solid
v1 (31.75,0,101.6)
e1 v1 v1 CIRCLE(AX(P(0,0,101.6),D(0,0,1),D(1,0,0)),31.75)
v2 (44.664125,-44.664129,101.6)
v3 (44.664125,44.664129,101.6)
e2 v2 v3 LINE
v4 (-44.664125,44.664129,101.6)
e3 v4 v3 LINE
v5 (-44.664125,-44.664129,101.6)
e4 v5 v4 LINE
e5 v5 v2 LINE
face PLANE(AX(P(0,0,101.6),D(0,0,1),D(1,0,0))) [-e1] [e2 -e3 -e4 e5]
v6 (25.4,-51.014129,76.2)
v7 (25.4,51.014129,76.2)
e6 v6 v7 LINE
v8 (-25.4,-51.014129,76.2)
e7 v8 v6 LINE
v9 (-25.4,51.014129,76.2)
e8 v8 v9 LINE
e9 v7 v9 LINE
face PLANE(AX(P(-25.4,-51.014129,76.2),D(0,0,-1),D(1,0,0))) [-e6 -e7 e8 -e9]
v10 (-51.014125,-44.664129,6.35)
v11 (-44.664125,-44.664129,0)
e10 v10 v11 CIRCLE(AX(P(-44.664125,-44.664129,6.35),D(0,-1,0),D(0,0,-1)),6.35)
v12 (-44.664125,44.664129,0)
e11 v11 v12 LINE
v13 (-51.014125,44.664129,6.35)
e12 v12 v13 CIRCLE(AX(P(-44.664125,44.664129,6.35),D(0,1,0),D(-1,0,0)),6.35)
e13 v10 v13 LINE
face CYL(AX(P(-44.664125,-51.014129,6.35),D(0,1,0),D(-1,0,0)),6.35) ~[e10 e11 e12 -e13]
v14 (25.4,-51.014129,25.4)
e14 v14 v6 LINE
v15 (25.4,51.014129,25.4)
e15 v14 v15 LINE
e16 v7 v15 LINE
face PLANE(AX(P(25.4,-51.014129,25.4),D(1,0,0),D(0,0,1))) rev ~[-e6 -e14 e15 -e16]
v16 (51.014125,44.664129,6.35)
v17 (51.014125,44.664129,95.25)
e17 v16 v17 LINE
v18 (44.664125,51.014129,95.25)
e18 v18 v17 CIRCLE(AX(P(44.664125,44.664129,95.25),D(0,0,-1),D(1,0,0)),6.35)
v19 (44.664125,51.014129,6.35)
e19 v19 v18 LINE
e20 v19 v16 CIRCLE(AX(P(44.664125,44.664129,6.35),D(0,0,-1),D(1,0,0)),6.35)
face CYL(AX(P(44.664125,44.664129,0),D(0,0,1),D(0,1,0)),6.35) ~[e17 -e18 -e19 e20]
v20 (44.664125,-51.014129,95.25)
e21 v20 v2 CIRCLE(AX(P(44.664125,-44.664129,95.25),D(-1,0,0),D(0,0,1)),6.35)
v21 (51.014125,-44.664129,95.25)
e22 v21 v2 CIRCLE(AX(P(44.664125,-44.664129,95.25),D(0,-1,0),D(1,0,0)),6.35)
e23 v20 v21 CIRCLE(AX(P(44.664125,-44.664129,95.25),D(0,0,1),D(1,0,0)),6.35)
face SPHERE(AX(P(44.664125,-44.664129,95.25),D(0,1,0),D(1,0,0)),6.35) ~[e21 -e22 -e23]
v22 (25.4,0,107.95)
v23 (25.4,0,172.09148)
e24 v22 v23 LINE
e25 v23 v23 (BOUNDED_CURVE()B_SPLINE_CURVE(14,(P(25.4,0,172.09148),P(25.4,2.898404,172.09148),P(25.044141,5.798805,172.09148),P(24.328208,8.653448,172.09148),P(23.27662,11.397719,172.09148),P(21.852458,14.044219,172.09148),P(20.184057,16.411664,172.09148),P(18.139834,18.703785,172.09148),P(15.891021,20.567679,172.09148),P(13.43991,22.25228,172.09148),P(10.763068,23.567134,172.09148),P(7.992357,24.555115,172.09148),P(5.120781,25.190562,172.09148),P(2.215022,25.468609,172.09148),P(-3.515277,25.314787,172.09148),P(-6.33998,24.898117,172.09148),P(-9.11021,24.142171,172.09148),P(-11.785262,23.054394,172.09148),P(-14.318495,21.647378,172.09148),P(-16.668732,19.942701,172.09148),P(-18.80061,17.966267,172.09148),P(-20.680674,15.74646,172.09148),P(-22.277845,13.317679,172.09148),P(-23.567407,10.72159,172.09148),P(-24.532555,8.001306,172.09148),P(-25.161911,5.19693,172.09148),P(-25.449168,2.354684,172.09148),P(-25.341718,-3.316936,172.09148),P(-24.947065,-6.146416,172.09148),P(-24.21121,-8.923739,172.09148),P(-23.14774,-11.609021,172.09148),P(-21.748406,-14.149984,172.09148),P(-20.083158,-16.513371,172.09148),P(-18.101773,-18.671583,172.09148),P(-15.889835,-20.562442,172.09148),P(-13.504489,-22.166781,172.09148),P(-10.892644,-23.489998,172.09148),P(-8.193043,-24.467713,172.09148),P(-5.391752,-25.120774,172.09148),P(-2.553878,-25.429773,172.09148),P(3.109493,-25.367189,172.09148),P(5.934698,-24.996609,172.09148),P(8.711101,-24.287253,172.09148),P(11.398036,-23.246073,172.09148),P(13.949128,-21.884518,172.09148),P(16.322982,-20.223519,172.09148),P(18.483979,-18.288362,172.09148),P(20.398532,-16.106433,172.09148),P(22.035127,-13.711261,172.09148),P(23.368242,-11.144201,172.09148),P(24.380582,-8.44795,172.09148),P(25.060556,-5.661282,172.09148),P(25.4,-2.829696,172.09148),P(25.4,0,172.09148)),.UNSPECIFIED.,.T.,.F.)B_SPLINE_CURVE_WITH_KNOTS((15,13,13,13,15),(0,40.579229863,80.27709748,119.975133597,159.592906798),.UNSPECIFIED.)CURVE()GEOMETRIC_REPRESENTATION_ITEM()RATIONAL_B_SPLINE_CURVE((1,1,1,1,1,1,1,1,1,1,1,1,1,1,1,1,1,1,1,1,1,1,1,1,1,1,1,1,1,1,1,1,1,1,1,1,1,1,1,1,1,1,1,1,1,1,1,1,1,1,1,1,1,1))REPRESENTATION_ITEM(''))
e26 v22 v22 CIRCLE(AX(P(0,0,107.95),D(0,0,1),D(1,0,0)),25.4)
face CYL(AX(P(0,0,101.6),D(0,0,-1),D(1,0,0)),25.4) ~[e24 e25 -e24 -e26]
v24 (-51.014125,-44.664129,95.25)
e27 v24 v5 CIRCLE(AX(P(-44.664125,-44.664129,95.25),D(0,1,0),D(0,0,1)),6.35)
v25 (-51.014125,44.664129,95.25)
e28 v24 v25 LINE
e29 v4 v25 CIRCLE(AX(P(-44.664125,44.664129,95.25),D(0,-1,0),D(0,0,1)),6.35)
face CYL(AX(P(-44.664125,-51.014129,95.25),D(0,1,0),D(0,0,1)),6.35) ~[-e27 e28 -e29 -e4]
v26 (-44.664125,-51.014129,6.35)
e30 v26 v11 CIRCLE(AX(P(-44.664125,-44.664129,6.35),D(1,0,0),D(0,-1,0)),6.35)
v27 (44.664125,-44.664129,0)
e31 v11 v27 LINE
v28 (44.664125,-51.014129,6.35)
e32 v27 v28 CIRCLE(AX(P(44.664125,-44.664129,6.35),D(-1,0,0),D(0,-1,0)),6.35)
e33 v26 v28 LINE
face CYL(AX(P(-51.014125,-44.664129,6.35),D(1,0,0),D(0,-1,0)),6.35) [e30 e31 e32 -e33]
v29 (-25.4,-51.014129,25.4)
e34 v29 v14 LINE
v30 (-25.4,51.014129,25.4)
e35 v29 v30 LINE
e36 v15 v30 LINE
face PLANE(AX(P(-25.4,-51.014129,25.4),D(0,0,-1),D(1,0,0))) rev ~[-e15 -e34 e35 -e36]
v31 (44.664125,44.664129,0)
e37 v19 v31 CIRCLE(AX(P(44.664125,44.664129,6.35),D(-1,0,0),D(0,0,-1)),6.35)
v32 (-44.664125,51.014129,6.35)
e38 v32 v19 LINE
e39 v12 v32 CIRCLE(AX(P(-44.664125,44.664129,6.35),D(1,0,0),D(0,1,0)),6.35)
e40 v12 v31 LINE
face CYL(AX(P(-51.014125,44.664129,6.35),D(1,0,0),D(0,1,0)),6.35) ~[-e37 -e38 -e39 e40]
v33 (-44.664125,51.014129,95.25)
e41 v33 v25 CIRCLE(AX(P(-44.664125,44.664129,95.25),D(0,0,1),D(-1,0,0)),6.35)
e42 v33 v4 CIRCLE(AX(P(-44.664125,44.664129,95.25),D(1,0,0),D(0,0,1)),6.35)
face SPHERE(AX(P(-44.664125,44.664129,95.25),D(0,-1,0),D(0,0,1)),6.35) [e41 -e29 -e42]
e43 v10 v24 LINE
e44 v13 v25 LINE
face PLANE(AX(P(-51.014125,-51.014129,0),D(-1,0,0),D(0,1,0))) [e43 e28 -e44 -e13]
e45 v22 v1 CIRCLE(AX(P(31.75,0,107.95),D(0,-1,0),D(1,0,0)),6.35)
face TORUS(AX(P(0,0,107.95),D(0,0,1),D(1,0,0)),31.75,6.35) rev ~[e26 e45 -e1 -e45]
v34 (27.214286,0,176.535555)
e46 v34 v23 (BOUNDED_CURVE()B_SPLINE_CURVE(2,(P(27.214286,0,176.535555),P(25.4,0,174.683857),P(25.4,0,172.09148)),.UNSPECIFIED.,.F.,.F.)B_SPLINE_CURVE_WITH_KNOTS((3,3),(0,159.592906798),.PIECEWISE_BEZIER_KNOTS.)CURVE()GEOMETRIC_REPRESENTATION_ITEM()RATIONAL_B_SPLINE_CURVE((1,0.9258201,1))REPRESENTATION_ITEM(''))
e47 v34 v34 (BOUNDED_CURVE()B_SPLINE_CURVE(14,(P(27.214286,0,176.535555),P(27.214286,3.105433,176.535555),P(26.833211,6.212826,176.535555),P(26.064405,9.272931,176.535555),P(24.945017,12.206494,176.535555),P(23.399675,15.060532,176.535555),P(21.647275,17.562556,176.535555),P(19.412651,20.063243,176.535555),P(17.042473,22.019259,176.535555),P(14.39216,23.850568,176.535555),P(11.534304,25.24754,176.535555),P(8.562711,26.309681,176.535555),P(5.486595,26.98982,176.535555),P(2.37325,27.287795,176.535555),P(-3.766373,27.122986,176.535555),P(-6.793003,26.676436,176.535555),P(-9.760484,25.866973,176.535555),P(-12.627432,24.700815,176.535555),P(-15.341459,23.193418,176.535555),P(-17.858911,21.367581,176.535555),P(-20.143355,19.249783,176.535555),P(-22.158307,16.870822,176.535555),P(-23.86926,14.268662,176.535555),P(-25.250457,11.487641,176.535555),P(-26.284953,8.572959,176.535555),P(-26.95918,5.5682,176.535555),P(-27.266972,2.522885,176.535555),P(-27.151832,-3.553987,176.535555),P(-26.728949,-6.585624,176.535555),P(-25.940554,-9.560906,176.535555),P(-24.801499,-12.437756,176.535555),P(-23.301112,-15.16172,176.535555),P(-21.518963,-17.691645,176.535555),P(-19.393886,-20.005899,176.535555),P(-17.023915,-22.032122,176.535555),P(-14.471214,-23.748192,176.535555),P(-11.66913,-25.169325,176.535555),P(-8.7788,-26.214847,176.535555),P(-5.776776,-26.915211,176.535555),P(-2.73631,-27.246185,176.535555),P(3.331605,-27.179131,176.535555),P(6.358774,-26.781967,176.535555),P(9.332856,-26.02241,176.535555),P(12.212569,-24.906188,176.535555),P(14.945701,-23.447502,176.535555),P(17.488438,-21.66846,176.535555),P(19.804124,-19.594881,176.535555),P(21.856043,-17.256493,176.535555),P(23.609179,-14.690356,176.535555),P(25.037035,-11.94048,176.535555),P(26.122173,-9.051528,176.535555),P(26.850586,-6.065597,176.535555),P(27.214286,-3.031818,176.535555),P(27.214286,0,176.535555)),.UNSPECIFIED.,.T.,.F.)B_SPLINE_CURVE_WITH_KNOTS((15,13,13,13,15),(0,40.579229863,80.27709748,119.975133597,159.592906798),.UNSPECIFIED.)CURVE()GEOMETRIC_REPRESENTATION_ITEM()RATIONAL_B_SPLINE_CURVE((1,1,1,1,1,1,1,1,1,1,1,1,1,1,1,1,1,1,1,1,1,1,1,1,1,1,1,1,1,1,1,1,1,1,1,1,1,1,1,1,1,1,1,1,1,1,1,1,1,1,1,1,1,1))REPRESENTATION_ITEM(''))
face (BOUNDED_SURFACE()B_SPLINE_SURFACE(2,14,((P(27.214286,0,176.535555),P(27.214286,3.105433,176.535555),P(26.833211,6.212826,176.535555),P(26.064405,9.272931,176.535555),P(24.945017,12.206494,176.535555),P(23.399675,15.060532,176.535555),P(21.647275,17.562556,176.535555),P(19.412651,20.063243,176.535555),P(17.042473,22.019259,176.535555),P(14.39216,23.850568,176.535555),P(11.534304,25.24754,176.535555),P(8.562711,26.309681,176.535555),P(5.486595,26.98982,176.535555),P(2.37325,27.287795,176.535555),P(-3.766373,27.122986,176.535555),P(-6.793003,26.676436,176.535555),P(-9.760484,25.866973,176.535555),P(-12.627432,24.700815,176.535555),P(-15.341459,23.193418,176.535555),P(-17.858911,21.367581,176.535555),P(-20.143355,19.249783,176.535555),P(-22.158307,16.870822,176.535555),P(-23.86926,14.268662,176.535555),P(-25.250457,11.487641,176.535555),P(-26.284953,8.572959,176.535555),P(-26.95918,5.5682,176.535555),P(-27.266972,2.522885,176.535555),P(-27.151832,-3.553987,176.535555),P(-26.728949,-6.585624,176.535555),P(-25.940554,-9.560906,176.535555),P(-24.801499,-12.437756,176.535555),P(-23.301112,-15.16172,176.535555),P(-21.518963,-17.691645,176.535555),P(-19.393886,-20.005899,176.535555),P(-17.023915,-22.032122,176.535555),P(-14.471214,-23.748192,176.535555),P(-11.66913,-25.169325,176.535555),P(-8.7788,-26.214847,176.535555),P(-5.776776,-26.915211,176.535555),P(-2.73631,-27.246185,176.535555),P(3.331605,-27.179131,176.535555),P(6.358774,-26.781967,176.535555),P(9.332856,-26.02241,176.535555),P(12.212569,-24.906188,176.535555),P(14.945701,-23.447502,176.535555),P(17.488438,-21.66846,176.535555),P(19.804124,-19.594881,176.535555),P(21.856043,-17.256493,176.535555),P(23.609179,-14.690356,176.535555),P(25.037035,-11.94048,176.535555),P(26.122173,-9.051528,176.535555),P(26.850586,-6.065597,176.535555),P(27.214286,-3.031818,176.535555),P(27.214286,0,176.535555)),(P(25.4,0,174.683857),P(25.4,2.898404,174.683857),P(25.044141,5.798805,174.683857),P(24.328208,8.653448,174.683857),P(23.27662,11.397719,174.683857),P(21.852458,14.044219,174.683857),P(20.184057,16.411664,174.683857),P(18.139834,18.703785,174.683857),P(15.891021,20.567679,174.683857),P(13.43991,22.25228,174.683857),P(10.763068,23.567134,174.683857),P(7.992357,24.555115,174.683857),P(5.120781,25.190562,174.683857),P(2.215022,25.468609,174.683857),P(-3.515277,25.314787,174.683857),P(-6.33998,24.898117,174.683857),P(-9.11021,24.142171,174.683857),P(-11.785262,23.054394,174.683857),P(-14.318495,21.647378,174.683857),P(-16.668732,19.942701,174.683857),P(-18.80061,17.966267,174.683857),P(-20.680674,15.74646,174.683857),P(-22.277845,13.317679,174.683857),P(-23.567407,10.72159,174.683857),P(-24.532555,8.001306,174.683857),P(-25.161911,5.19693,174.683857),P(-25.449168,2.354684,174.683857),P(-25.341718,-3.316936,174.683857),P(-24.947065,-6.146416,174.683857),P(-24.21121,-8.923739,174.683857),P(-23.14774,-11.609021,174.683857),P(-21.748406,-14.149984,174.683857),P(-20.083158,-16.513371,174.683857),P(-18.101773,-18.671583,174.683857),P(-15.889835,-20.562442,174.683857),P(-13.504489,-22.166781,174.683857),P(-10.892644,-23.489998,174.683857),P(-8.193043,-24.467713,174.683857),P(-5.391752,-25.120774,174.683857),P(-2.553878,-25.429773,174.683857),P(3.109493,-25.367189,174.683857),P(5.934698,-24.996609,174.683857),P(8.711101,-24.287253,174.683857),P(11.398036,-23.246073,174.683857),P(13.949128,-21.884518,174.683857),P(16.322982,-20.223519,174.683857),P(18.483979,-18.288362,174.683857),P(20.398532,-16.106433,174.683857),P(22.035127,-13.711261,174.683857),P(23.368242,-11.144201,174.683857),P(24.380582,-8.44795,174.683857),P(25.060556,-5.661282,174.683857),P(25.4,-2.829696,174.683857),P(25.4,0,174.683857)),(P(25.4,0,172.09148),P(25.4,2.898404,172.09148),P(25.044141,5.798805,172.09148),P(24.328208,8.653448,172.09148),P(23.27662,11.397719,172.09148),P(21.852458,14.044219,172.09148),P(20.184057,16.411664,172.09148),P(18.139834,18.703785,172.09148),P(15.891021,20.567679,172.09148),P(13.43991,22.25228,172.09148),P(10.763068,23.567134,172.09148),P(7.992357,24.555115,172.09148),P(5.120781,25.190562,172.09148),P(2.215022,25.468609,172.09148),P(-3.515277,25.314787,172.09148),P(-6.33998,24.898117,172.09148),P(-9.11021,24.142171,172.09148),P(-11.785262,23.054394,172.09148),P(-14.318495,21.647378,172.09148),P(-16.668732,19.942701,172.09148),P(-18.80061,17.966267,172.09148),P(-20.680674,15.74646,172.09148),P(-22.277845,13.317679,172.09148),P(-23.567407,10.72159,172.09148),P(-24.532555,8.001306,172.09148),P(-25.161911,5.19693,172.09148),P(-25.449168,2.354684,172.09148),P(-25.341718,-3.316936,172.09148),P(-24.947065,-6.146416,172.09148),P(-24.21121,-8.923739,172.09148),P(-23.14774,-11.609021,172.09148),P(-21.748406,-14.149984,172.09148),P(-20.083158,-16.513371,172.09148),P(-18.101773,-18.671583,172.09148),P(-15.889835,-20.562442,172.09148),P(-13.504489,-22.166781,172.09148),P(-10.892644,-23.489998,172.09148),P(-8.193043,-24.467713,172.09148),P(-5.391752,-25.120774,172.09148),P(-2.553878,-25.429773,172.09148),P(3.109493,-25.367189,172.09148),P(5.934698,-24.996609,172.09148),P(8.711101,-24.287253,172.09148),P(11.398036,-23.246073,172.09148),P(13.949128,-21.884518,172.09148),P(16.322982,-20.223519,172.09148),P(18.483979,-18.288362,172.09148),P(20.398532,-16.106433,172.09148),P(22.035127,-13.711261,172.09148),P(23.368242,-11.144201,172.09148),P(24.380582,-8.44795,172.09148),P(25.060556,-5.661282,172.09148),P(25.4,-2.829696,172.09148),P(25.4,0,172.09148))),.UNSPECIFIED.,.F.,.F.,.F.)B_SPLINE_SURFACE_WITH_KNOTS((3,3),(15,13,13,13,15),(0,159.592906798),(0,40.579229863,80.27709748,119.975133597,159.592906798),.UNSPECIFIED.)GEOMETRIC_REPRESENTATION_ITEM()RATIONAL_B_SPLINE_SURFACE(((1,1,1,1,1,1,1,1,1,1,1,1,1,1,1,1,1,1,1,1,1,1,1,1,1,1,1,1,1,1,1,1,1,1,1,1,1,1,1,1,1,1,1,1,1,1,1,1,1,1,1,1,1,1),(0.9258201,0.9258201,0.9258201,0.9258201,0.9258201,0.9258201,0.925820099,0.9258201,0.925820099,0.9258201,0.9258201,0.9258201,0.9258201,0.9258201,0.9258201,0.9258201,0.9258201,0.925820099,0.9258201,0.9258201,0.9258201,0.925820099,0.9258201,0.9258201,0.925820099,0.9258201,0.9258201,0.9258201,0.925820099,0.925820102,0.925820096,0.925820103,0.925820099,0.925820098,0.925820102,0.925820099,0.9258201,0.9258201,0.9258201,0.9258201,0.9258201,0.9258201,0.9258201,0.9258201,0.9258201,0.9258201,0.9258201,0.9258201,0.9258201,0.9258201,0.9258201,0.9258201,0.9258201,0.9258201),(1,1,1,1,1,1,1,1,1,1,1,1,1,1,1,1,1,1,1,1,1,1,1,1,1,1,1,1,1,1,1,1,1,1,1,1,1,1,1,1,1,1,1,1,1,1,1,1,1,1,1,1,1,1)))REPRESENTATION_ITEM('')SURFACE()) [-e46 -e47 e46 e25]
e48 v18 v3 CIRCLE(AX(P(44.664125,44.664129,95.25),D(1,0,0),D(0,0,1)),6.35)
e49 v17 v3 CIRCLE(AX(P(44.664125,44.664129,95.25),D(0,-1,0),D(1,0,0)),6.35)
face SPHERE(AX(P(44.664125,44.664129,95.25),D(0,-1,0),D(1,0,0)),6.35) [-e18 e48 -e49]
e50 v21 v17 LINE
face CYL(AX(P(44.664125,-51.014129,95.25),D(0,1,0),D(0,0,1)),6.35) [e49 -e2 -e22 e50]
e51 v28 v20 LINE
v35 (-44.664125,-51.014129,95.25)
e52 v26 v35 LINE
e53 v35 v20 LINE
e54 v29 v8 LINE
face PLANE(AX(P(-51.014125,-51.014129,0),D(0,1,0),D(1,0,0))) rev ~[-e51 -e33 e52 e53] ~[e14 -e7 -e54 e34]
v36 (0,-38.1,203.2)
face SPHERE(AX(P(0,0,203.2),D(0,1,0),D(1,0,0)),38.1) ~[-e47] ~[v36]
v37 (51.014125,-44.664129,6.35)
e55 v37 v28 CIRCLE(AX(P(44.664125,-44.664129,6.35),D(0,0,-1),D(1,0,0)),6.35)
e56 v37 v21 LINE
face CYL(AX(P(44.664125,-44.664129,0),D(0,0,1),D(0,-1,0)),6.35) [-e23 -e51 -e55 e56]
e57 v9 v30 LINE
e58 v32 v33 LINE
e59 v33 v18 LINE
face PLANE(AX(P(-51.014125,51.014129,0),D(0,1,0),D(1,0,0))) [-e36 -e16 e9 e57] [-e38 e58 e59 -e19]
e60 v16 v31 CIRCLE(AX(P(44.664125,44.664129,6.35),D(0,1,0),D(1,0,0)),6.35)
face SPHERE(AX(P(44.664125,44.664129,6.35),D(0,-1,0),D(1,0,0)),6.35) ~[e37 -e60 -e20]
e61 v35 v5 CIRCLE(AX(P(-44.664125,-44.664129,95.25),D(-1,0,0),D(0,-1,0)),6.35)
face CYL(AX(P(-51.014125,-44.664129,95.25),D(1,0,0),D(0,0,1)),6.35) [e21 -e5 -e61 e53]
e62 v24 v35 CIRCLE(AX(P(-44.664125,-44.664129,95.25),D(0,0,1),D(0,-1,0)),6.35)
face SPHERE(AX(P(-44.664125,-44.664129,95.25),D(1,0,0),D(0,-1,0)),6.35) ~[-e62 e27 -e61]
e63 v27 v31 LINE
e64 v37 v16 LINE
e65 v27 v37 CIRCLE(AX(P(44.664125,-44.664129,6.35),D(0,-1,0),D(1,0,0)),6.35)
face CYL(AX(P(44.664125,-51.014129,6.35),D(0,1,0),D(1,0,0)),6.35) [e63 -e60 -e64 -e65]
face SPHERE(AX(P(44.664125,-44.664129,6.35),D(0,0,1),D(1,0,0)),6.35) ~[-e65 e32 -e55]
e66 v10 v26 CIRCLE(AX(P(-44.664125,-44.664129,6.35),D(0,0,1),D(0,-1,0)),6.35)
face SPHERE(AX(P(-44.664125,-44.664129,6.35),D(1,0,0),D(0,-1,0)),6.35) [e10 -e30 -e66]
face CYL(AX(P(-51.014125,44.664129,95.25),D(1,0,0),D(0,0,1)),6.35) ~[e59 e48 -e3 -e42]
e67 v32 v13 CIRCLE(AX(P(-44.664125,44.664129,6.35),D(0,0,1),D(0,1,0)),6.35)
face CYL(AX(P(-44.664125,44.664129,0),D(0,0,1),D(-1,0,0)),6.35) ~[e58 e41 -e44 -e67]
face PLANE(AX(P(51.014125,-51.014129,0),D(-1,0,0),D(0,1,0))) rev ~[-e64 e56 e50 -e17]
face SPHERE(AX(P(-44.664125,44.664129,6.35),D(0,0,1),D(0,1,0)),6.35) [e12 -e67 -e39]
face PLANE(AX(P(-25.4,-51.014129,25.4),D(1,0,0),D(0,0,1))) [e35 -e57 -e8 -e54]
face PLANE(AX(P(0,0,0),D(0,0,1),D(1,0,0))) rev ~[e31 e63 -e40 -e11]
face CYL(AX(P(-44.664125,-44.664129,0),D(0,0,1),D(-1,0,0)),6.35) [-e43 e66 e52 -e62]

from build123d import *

# Parameters (mm, degrees)
F0_W     = 102.0282506943
F0_H     = 102.0282581449
F1_DEPTH = 101.6
F2_R     = 25.4
F3_DEPTH = 101.6
F6_W     = 50.8
F6_H     = 50.8
F7_DEPTH = 130.048
F8_R     = 6.35


with BuildPart() as f1:
    # F0 (on Top) → F1 (new body)
    with BuildSketch(Plane.XY):
        Rectangle(F0_W, F0_H)
    extrude(amount=F1_DEPTH)

    # F2 (on face) → F3 (join)
    with BuildSketch(Plane.XY.offset(101.6)):
        Circle(F2_R)
    extrude(amount=F3_DEPTH)

    # F4 (on face) → F5 (revolve)
    with BuildSketch(Plane.XY.offset(203.2)):
        with BuildLine():
            Line((0, -25.4), (0, -38.1))
            ThreePointArc((0, -38.1), (38.1, 0), (0, 38.1))
            Line((0, 38.1), (0, 25.4))
            ThreePointArc((0, 25.4), (17.9605122421, 17.9605122421), (25.4, 0))
            ThreePointArc((25.4, 0), (17.9605122421, -17.9605122421), (0, -25.4))
        make_face()
        with BuildLine():
            ThreePointArc((0, 25.4), (-25.4, 0), (0, -25.4))
            Line((0, -25.4), (0, 0))
            Line((0, 0), (0, 25.4))
        make_face()
    revolve(axis=Axis((0, 0, 203.2), (0, -1, 0)))

    # F6 (on face) → F7 (cut)
    with BuildSketch(Plane.XZ.offset(51.0141290724)):
        with Locations((0, 50.8)):
            Rectangle(F6_W, F6_H)
    extrude(amount=-F7_DEPTH, mode=Mode.SUBTRACT)

    # F8
    f8_edges = [f1.edges().sort_by_distance(p)[0] for p in [
        (51.014125, 0, 101.6),
        (51.014125, -51.014129, 50.8),
        (51.014125, 0, 0),
        (51.014125, 51.014129, 50.8),
        (0, -51.014129, 101.6),
        (0, -51.014129, 0),
        (-51.014125, -51.014129, 50.8),
        (-51.014125, 0, 101.6),
        (0, 51.014129, 101.6),
        (-51.014125, 51.014129, 50.8),
        (0, 51.014129, 0),
        (-51.014125, 0, 0),
        (-25.4, 0, 101.6),
        (-25.4, 0, 174.801937),
    ]]
    fillet(f8_edges, radius=F8_R)


solid = f1.part
